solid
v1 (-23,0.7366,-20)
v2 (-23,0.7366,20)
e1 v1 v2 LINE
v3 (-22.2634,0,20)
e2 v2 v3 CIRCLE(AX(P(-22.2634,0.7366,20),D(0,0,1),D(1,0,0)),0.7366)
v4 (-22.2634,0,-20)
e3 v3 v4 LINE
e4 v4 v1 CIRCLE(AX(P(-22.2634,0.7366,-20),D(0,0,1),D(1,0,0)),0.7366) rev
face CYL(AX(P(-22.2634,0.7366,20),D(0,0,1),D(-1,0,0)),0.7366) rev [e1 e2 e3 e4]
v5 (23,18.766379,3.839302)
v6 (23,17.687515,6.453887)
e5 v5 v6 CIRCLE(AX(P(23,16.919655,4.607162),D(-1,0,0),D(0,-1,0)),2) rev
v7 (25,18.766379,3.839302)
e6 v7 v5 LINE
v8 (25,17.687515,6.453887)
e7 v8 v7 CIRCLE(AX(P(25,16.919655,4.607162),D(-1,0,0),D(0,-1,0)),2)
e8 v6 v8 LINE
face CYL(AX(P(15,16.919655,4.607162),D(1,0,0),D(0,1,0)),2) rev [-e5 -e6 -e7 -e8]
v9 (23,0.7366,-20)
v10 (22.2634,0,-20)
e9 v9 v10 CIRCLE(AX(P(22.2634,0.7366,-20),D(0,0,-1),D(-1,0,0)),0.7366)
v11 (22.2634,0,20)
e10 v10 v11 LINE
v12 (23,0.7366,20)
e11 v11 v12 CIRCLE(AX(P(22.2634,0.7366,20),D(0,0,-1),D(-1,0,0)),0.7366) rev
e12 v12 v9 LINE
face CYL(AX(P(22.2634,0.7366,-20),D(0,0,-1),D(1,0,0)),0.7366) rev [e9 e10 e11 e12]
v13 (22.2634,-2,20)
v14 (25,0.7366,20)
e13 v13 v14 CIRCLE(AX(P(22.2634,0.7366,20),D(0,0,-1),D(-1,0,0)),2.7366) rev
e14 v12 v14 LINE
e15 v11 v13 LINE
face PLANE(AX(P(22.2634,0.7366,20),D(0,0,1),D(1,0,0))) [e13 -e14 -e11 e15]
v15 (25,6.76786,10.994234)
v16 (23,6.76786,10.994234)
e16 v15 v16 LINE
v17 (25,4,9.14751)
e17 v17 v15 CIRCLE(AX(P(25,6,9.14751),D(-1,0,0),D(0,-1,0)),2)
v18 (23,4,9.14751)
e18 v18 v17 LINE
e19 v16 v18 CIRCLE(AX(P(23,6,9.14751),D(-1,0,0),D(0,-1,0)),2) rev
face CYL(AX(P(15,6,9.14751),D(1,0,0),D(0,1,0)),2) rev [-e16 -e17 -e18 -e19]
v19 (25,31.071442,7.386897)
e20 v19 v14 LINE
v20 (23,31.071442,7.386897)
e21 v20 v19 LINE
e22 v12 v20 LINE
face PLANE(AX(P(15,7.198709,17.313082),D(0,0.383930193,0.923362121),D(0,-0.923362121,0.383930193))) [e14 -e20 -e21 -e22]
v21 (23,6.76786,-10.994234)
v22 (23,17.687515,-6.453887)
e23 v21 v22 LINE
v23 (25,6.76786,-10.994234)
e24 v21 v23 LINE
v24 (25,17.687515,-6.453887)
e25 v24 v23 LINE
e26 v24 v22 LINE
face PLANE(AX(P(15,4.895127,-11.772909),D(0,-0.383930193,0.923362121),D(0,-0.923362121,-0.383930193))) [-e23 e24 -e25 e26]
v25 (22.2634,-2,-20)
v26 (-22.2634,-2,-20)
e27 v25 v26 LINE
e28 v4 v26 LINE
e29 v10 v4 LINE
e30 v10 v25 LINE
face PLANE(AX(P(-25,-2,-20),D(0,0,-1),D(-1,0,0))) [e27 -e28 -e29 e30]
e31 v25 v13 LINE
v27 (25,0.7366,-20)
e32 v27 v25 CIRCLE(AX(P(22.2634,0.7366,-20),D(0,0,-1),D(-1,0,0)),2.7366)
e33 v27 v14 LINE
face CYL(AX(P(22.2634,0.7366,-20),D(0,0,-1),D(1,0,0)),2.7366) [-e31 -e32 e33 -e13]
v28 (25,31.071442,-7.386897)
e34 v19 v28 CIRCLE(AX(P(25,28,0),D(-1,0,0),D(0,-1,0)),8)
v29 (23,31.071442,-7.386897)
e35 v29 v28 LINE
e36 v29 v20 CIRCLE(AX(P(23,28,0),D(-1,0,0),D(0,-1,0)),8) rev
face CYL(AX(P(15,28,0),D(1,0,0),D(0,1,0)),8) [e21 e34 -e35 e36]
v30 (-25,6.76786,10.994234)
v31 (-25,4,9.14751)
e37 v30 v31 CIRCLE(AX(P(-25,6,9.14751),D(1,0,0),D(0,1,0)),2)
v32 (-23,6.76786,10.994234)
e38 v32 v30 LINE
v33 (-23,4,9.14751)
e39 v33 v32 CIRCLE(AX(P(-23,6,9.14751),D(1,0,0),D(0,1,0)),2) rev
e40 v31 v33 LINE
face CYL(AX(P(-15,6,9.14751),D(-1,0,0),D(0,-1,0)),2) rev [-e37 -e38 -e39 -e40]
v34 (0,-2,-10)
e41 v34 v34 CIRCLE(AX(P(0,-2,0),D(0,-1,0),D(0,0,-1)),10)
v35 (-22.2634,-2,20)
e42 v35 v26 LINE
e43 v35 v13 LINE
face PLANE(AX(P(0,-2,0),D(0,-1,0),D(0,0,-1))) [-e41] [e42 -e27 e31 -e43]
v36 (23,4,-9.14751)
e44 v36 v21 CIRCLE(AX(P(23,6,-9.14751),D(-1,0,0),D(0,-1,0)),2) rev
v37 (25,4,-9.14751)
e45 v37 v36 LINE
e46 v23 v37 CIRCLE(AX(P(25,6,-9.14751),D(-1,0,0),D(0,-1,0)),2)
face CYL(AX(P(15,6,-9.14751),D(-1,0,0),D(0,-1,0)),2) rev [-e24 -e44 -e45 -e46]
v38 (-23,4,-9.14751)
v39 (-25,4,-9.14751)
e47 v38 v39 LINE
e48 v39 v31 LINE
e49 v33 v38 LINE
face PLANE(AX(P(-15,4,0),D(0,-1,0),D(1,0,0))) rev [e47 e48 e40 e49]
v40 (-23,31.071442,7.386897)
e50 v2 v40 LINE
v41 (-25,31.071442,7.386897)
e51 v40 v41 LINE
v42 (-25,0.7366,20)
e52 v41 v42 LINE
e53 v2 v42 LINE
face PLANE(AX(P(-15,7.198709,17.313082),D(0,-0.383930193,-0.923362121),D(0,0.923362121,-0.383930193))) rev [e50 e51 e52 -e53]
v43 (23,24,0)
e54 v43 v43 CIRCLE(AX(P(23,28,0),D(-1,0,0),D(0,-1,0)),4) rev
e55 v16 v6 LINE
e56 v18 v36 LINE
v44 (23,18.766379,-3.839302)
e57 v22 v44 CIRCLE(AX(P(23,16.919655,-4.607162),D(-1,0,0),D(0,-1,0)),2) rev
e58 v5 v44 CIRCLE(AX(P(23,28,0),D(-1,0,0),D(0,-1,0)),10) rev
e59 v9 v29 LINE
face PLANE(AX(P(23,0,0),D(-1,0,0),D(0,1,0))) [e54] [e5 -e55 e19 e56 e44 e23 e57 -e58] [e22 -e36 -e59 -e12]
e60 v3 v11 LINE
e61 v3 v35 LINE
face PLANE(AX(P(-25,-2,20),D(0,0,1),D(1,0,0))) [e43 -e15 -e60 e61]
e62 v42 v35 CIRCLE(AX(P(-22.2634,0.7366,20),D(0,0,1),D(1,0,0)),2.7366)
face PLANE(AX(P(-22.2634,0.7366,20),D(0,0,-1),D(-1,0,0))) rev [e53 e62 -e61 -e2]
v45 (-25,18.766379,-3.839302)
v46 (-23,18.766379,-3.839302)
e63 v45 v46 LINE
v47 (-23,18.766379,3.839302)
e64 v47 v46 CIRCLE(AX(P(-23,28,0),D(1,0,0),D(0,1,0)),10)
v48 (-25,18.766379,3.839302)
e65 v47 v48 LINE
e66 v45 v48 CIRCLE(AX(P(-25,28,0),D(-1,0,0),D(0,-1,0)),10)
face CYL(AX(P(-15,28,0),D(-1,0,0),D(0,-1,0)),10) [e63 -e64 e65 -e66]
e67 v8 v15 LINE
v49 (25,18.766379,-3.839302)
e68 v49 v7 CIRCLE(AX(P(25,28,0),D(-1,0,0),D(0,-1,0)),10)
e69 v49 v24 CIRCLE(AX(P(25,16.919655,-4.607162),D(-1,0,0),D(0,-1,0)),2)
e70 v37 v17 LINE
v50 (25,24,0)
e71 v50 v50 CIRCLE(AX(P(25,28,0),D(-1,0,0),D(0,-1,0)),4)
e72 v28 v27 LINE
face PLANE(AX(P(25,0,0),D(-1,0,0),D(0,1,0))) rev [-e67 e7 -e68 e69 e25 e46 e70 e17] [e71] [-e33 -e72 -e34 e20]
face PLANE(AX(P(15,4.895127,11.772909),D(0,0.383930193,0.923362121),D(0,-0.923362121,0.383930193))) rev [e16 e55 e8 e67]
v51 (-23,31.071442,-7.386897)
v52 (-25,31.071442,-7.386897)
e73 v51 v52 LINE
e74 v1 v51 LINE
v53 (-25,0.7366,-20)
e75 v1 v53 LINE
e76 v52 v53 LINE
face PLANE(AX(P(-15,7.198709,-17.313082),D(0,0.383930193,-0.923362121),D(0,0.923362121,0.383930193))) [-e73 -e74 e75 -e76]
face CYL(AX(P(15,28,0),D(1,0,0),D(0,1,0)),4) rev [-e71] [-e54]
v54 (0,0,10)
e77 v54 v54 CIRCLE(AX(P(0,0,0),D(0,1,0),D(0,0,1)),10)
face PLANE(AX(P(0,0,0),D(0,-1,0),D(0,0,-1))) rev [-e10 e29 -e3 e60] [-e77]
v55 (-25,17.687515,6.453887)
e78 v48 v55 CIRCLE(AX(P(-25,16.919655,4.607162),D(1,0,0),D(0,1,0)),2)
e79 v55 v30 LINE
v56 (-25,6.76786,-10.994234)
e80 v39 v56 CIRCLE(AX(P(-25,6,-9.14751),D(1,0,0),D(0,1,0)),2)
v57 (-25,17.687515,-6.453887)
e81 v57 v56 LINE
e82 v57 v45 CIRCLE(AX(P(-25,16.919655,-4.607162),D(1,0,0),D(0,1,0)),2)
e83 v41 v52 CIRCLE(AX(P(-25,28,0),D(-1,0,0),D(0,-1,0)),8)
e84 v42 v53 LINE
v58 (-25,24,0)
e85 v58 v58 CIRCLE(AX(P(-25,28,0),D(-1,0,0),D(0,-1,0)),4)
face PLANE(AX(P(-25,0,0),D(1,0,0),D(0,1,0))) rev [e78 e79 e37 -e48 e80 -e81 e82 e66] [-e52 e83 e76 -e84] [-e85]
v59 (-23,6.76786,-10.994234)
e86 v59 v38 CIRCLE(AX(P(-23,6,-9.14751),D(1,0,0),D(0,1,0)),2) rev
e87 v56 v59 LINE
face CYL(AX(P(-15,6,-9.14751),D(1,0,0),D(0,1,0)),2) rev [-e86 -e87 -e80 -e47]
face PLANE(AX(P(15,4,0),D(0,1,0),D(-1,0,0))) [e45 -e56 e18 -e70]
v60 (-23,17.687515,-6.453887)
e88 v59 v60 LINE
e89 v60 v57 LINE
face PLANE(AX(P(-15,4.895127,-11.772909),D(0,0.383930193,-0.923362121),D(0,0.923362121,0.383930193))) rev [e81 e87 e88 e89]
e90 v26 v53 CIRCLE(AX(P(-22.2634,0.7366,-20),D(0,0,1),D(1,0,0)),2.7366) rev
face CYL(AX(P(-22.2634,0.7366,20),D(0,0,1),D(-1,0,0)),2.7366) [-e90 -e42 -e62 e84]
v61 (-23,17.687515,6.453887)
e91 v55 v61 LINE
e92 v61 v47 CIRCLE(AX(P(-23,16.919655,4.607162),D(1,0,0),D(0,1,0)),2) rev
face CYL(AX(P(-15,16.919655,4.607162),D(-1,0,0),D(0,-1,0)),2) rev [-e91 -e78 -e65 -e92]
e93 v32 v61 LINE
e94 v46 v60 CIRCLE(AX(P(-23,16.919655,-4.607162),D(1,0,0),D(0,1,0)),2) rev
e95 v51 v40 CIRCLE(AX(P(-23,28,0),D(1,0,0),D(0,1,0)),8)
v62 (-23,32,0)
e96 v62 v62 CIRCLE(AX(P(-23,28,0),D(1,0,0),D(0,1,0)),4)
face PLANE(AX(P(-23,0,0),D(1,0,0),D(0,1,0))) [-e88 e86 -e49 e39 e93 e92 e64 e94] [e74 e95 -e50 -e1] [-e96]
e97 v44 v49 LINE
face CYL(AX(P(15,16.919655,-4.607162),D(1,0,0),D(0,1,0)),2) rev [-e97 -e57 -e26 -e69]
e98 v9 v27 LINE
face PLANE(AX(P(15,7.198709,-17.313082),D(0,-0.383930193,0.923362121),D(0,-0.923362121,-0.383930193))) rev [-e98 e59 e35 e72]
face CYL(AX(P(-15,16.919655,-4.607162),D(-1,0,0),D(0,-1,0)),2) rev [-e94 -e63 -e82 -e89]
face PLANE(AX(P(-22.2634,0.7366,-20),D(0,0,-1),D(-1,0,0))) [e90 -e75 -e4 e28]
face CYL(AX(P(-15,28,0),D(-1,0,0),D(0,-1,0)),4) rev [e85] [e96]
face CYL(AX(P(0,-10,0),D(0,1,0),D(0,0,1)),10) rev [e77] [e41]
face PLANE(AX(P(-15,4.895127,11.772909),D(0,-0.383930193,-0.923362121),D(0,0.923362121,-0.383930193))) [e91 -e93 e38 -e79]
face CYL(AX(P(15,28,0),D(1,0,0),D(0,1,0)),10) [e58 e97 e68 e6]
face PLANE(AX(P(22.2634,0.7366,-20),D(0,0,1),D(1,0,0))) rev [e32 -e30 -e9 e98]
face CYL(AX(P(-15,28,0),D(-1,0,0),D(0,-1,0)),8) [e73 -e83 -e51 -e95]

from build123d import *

# Parameters (mm, degrees)
SKETCH1_W                    = 50
SKETCH1_H                    = 40
BASE_FLANGE1_DEPTH           = 2
EDGE_FLANGE1_STRIP_W         = 9.4732
EDGE_FLANGE1_STRIP_H         = 2
EDGE_FLANGE1_STRIP_CUT_DEPTH = 40
EDGE_FLANGE1_DEPTH           = 40
SKETCH14_R                   = 4
CUT_EXTRUDE2_DEPTH           = 10
FILLET1_R                    = 2
FILLET1_OF_MIRROR2_R         = 2
SKETCH23_R                   = 10
CUT_EXTRUDE3_DEPTH           = 10


# Sheet-metal steps are written as plain solids
with BuildPart() as part:
    # Sketch1 → Base-Flange1 (new body)
    with BuildSketch(Plane(origin=(0, 0, 0), x_dir=(1, 0, 0), z_dir=(0, 1, 0))):
        Rectangle(SKETCH1_W, SKETCH1_H)
    extrude(amount=-BASE_FLANGE1_DEPTH)

    # Edge-Flange1 strip (across the edge) → Edge-Flange1 strip cut (cut)
    with BuildSketch(Plane(origin=(-25, 0, -20), x_dir=(1, 0, 0), z_dir=(0, 0, 1))):
        with Locations((-2, -1)):
            Rectangle(EDGE_FLANGE1_STRIP_W, EDGE_FLANGE1_STRIP_H)
    edge_flange1_strip_cut = extrude(amount=EDGE_FLANGE1_STRIP_CUT_DEPTH, mode=Mode.SUBTRACT)

    # Edge-Flange1 section (across the edge) → Edge-Flange1 (add)
    with BuildSketch(Plane(origin=(-25, 0, -20), x_dir=(1, 0, 0), z_dir=(0, 0, 1))):
        with BuildLine():
            Line((0, 0.7366), (0, 36))
            Line((0, 36), (2, 36))
            Line((2, 36), (2, 0.7366))
            ThreePointArc((2, 0.7366), (2.215745145, 0.215745145), (2.7366, 0))
            Line((2.7366, 0), (2.7366, -2))
            ThreePointArc((2.7366, -2), (0.801531583, -1.198468417), (0, 0.7366))
        make_face()
    edge_flange1 = extrude(amount=EDGE_FLANGE1_DEPTH)

    # Sketch14 → Cut-Extrude2 (cut)
    with BuildSketch(Plane.ZY.offset(25)):
        with BuildLine():
            Line((-20, 0.7366), (-7.38689697, 31.071441544))
            ThreePointArc((-7.38689697, 31.071441544), (-4.440071376, 34.654755155), (0, 36))
            Line((0, 36), (-20, 36))
            Line((-20, 36), (-20, 0.7366))
        make_face()
        with BuildLine():
            Line((20, 36), (0, 36))
            ThreePointArc((0, 36), (4.440071376, 34.654755155), (7.38689697, 31.071441544))
            Line((7.38689697, 31.071441544), (20, 0.7366))
            Line((20, 0.7366), (20, 36))
        make_face()
        with BuildLine():
            Line((-5.608456521, 19.720796207), (-12.145099279, 4))
            Line((-12.145099279, 4), (12.145099279, 4))
            Line((12.145099279, 4), (5.608456521, 19.720796207))
            ThreePointArc((5.608456521, 19.720796207), (0, 18), (-5.608456521, 19.720796207))
        make_face()
        with Locations(Location((0, 28, 0), (0, 0, 270))):
            Circle(SKETCH14_R)
    cut_extrude2 = extrude(amount=-CUT_EXTRUDE2_DEPTH, mode=Mode.SUBTRACT)

    # Fillet1
    fillet1_edges = [part.edges().sort_by_distance(p)[0] for p in [
        (-24, 19.720796207, -5.608456521),
        (-24, 19.720796207, 5.608456521),
        (-24, 4, 12.145099279),
        (-24, 4, -12.145099279),
    ]]
    fillet(fillet1_edges, radius=FILLET1_R)

    # Mirror2: Edge-Flange1 strip cut, Edge-Flange1, Cut-Extrude2 across plane
    add(edge_flange1_strip_cut.mirror(Plane(origin=(0, 0, 0), x_dir=(0, 0, 1), z_dir=(1, 0, 0))), mode=Mode.SUBTRACT)
    add(edge_flange1.mirror(Plane(origin=(0, 0, 0), x_dir=(0, 0, 1), z_dir=(1, 0, 0))))
    add(cut_extrude2.mirror(Plane(origin=(0, 0, 0), x_dir=(0, 0, 1), z_dir=(1, 0, 0))), mode=Mode.SUBTRACT)

    # Fillet1 of Mirror2
    fillet1_of_mirror2_edges = [part.edges().sort_by_distance(p)[0] for p in [
        (24, 19.720796207, -5.608456521),
        (24, 19.720796207, 5.608456521),
        (24, 4, 12.145099279),
        (24, 4, -12.145099279),
    ]]
    fillet(fillet1_of_mirror2_edges, radius=FILLET1_OF_MIRROR2_R)

    # Sketch23 → Cut-Extrude3 (cut)
    with BuildSketch(Plane(origin=(0, 0, 0), x_dir=(1, 0, 0), z_dir=(0, 1, 0))):
        with Locations(Location((0, 0, 0), (0, 0, 270))):
            Circle(SKETCH23_R)
    extrude(amount=-CUT_EXTRUDE3_DEPTH, mode=Mode.SUBTRACT)


solid = part.part
